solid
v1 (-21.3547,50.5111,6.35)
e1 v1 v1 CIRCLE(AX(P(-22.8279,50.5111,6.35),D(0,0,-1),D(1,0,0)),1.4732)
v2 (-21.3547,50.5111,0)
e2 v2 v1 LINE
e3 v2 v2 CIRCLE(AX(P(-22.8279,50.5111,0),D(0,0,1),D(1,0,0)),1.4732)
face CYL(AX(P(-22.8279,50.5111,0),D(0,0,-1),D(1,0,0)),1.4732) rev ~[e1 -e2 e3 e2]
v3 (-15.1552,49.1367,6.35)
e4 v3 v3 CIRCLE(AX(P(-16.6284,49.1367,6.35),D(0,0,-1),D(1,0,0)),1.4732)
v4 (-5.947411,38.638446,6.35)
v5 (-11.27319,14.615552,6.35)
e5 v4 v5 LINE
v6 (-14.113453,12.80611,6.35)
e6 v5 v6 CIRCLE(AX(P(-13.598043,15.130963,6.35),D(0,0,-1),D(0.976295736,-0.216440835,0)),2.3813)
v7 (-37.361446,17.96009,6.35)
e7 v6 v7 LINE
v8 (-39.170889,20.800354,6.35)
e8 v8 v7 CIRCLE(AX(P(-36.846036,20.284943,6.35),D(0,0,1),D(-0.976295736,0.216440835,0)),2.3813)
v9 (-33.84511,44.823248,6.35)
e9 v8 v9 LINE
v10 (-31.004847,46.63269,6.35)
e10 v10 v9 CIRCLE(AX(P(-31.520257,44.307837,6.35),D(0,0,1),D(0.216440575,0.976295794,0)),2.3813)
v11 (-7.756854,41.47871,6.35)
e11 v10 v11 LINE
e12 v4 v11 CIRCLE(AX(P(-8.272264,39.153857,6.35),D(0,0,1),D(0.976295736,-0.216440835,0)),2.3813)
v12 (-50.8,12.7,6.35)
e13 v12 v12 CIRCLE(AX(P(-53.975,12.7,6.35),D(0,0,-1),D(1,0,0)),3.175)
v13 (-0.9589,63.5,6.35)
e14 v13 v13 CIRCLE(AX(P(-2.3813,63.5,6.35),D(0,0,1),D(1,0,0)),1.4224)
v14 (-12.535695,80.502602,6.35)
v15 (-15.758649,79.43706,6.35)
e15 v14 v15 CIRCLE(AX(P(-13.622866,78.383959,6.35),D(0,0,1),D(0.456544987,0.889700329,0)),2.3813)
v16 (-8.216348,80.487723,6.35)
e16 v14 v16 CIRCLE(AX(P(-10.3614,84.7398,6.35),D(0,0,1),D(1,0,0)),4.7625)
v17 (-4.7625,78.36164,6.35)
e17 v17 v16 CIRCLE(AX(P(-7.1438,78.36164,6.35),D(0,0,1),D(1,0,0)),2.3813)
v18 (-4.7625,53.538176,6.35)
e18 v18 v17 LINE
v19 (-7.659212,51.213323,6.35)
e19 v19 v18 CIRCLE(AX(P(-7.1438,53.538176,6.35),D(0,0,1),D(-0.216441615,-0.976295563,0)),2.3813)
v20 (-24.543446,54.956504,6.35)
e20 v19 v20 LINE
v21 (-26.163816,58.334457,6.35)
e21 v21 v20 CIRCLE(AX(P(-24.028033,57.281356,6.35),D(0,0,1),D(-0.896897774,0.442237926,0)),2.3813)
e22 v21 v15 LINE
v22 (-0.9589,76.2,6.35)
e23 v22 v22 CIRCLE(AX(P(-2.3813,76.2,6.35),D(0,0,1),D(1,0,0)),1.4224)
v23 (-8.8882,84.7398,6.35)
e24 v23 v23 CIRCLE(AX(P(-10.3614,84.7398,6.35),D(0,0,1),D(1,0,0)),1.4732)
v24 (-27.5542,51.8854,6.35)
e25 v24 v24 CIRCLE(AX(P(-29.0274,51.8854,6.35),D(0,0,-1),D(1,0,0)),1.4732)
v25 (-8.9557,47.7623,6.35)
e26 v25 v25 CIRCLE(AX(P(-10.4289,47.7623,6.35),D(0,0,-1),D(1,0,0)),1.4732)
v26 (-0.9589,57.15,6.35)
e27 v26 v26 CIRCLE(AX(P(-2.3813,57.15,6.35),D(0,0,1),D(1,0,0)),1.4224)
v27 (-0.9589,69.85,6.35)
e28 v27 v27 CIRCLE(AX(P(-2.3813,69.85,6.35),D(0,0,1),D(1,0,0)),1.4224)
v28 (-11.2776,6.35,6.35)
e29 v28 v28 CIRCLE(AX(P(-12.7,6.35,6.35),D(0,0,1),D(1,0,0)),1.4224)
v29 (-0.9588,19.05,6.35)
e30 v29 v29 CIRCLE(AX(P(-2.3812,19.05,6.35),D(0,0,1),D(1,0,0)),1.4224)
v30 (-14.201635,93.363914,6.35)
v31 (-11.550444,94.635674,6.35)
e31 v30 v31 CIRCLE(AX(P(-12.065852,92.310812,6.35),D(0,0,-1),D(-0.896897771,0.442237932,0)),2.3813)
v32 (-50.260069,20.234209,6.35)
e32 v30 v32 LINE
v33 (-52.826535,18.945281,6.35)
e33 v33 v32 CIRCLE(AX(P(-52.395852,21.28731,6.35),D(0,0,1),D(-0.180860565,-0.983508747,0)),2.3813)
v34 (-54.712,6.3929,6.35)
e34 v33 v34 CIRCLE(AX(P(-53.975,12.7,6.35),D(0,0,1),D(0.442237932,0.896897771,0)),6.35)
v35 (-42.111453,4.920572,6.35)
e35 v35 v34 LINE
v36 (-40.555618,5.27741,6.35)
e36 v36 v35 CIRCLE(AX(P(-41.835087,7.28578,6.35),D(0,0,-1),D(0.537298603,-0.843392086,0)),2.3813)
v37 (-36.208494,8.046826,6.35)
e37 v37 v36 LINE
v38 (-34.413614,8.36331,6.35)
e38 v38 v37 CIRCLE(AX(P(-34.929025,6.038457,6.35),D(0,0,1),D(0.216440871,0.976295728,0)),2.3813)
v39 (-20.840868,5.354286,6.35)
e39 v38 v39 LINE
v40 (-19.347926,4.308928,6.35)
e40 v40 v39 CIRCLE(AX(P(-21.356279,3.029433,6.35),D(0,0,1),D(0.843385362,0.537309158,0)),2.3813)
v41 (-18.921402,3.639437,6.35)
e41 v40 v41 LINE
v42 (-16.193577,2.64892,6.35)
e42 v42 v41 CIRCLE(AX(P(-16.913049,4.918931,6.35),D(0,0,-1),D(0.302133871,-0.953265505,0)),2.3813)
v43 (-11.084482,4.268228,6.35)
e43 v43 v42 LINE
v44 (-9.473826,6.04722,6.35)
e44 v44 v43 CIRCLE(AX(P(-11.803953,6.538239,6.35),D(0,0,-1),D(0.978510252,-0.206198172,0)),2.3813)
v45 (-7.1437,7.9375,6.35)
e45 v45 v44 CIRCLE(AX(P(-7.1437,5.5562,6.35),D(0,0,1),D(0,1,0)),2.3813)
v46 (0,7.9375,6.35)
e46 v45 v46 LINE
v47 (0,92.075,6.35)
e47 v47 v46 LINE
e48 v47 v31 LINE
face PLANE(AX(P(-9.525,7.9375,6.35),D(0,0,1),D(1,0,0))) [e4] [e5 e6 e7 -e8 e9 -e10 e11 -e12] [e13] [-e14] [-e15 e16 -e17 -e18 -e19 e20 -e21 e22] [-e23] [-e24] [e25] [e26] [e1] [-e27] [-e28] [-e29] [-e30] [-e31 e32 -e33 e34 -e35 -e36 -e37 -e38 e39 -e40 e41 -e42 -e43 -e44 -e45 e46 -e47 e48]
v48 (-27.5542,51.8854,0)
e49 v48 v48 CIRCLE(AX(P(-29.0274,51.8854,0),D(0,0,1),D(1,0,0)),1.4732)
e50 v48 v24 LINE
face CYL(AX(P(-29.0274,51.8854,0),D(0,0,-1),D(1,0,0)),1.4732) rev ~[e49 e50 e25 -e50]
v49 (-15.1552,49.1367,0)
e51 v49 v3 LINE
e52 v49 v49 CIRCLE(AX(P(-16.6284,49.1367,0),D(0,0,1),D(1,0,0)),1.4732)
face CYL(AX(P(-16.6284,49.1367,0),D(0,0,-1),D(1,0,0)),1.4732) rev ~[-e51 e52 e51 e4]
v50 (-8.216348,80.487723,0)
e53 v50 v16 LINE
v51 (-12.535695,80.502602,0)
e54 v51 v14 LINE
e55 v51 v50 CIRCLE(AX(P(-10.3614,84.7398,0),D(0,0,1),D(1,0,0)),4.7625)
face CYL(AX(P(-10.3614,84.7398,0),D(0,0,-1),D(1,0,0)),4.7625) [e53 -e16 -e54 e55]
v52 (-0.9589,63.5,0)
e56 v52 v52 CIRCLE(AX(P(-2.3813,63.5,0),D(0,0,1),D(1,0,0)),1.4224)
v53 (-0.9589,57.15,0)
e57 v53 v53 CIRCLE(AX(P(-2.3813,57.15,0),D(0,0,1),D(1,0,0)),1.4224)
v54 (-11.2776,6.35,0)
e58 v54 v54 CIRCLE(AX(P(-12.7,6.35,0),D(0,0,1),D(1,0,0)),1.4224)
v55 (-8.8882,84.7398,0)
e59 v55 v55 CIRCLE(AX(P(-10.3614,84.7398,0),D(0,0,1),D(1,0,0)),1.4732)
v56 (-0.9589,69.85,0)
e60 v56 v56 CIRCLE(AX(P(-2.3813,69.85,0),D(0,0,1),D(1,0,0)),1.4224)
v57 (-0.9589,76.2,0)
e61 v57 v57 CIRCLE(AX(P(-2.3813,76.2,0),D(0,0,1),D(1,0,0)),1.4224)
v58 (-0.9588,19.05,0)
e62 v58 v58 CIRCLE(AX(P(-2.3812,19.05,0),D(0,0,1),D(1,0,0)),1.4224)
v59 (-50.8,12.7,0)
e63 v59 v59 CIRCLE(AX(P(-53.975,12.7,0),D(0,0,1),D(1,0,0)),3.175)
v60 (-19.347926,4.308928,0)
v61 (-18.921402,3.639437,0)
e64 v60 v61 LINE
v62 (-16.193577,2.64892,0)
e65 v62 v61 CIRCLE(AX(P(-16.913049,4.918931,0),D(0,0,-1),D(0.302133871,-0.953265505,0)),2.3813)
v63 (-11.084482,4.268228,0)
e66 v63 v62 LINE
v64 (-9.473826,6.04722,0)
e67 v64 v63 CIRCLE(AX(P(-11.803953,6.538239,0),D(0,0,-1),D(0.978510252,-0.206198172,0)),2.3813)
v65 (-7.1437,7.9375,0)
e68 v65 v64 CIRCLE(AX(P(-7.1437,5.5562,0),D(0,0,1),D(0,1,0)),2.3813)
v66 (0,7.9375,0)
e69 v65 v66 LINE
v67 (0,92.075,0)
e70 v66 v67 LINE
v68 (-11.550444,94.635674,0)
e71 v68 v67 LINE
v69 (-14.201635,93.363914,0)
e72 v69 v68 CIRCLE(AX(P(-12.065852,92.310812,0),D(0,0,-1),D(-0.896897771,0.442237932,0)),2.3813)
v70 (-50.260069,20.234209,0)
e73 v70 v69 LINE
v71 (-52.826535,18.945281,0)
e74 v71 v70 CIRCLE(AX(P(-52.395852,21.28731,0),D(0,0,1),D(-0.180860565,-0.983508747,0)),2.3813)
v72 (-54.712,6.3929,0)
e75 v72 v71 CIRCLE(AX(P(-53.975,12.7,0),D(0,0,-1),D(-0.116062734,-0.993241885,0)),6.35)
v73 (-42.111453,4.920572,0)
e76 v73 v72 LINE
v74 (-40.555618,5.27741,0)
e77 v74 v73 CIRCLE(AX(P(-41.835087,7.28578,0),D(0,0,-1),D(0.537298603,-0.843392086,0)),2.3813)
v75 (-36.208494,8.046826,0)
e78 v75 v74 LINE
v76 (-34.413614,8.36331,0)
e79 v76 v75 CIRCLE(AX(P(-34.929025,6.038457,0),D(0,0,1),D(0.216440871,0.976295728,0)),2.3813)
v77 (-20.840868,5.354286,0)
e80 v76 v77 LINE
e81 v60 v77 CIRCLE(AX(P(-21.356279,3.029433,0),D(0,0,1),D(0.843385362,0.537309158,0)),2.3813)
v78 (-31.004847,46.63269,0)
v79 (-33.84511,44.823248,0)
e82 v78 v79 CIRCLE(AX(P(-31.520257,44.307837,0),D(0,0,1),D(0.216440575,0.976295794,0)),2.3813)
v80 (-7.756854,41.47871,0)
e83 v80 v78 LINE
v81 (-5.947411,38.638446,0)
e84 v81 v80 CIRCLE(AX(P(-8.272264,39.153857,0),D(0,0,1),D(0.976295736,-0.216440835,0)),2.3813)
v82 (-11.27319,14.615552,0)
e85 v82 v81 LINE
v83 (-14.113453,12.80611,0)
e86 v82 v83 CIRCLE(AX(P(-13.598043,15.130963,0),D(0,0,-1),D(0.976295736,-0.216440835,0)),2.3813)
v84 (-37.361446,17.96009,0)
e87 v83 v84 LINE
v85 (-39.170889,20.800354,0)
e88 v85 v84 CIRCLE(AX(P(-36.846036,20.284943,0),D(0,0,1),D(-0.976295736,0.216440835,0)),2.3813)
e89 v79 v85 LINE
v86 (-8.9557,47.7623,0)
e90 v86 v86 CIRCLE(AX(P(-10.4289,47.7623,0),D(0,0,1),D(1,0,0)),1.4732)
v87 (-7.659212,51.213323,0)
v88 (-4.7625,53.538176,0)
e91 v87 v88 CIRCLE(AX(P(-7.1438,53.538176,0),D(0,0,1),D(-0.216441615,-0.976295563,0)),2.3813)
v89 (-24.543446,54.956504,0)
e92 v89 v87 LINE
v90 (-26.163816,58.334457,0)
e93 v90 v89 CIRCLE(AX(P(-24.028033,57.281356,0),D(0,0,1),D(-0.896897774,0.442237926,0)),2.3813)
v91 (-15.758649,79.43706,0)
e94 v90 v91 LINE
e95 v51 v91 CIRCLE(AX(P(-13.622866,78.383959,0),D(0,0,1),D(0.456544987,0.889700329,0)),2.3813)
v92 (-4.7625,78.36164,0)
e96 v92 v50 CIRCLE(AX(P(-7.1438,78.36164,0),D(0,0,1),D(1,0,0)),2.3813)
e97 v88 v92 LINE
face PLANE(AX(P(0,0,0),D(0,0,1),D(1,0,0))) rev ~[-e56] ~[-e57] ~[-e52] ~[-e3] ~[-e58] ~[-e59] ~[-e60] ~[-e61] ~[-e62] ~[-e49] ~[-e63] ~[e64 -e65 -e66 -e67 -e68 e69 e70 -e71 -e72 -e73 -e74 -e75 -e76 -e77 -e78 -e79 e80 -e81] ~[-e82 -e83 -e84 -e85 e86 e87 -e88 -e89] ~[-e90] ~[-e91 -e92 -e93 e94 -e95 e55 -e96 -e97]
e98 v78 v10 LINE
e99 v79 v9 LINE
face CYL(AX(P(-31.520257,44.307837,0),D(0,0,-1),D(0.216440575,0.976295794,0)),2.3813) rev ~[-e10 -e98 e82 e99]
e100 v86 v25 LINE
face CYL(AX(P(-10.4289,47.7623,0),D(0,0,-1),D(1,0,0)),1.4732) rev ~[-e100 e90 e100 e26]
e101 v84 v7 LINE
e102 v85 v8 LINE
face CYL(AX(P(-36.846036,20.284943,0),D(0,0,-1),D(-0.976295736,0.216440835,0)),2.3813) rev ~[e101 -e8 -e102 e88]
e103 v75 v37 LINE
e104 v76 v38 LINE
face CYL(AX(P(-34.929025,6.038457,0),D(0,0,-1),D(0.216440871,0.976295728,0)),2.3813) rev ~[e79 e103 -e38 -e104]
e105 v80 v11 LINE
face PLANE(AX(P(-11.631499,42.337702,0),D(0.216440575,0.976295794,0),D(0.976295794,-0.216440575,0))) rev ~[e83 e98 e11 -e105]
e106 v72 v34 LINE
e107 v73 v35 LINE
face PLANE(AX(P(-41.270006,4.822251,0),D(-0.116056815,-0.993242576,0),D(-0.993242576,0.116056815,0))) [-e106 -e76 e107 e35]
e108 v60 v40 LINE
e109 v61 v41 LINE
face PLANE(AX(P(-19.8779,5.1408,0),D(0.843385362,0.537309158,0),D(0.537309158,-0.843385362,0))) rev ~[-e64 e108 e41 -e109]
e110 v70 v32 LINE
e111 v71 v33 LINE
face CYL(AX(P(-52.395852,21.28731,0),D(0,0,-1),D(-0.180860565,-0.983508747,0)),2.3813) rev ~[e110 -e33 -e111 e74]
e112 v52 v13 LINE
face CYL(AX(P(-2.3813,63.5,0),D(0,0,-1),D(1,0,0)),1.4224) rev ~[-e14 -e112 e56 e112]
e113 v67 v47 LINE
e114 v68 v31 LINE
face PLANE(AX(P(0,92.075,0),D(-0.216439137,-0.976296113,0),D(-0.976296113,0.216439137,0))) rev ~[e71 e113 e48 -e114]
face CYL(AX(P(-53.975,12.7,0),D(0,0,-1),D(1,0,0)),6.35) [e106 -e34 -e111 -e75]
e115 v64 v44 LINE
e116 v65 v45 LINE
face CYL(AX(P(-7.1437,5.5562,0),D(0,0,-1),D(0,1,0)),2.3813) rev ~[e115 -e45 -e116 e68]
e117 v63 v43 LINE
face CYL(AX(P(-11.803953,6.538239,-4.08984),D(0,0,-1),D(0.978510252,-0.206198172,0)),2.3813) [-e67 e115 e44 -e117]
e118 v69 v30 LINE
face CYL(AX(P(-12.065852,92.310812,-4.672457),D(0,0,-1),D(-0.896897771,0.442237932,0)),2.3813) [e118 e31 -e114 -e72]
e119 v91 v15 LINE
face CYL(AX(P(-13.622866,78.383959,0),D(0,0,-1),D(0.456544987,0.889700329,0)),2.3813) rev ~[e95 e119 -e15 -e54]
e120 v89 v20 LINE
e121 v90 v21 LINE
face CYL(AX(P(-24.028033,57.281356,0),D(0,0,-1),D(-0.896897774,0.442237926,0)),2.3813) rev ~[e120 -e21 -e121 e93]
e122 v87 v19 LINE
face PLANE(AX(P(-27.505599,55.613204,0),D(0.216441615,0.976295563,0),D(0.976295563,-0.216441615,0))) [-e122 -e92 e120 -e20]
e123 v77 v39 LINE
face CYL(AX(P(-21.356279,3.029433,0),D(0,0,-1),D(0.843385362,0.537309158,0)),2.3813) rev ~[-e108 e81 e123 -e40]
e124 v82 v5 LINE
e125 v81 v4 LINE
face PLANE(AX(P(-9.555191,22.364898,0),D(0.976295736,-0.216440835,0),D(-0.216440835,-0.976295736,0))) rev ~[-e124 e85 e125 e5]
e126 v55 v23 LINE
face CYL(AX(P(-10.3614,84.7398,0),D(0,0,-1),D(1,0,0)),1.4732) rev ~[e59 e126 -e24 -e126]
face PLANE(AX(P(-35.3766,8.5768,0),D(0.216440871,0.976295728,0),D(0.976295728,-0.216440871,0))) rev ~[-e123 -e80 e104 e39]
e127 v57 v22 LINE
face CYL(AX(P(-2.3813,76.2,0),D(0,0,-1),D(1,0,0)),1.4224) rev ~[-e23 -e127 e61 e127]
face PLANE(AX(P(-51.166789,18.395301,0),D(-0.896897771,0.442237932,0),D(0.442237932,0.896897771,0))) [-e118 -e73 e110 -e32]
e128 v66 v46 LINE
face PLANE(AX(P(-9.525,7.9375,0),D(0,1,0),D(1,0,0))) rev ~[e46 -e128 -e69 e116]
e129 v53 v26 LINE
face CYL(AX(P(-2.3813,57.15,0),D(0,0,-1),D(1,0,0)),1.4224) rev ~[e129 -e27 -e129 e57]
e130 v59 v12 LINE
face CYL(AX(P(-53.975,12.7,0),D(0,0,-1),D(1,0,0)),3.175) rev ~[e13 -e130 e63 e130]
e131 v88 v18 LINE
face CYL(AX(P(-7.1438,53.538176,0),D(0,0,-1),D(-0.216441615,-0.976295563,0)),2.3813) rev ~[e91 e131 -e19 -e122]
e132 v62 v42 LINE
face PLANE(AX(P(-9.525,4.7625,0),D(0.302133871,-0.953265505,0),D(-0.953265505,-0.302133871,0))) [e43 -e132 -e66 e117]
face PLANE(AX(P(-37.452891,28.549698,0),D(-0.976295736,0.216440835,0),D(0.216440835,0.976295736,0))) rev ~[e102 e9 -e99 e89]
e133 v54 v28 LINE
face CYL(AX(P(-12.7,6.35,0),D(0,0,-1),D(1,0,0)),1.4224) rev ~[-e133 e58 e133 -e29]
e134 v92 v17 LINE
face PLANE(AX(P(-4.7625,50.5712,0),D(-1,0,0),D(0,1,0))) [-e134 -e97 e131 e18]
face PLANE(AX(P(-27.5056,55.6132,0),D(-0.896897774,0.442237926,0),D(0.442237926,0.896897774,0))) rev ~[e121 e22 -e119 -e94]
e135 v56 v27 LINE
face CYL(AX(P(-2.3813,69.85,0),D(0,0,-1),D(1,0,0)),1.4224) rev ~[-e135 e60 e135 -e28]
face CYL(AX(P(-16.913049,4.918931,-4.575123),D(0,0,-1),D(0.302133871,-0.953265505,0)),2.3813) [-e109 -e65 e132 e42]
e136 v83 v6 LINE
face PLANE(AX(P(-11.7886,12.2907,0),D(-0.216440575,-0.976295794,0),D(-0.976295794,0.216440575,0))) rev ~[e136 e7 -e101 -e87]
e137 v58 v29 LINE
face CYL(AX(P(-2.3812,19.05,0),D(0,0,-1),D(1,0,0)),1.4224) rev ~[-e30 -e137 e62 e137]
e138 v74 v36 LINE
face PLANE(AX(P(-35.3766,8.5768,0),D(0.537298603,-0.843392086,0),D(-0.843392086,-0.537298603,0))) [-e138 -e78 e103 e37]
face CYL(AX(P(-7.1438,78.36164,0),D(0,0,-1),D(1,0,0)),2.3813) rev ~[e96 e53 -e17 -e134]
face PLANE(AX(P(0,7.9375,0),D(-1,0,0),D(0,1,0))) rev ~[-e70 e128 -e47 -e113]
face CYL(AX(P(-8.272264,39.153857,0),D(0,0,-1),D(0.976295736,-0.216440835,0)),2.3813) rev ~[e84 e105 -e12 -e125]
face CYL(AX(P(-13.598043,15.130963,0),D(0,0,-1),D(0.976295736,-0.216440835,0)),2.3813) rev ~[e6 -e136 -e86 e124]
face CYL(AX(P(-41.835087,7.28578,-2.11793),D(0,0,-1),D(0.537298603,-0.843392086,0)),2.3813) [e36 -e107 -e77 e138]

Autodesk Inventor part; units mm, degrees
ref_plane "YZ Plane" through (0, 0, 0) normal (1, 0, 0) x (0, 1, 0)
ref_plane "XZ Plane" through (0, 0, 0) normal (0, 1, 0) x (-1, 0, 0)
ref_plane "XY Plane" through (0, 0, 0) normal (0, 0, 1) x (1, 0, 0)
sketch "Sketch1" plane through (0, 0, 0) normal (0, 0, 1) x (1, 0, 0)
  line L0 (0, 0) -> (0, 136.525)
  line L1 (-11.7886, 12.2907) -> (-39.6863, 18.4755)
  line L2 (-39.6863, 18.4755) -> (-33.3297, 47.1481)
  line L3 (-33.3297, 47.1481) -> (-5.432, 40.9633)
  line L4 (-5.432, 40.9633) -> (-11.7886, 12.2907)
  line L5 (-39.6863, 18.4755) -> (-5.432, 40.9633) construction
  line L6 (-33.3297, 47.1481) -> (-11.7886, 12.2907) construction
  circle A0 centre (-53.975, 12.7) radius 3.175
  circle A1 centre (-53.975, 12.7) radius 6.35
  line L7 (0, 0) -> (-54.712, 6.3929)
  line L8 (-59.6703, 15.5082) -> (0, 136.525)
  line L9 (-27.1302, 45.7737) -> (-37.4529, 28.5497)
  line L10 (-11.6315, 42.3377) -> (-9.5552, 22.3649)
  line L11 (-19.3809, 44.0557) -> (-25.7374, 15.3831) construction
  line L12 (0, 92.075) -> (-19.7574, 96.4551)
  line L13 (-35.3766, 8.5768) -> (-19.8779, 5.1408)
  line L14 (-19.8779, 5.1408) -> (-21.2523, -1.0586)
  line L15 (-21.2523, -1.0586) -> (-36.751, 2.3773)
  line L16 (-36.751, 2.3773) -> (-35.3766, 8.5768)
  line L17 (-35.3766, 8.5768) -> (-41.27, 4.8223)
  line L18 (-19.8779, 5.1408) -> (-17.9381, 2.096)
  line L19 (-5.432, 40.9633) -> (-33.3297, 47.1481)
  line L20 (-33.3297, 47.1481) -> (-32.2475, 52.0296)
  line L21 (-32.2475, 52.0296) -> (-4.3498, 45.8448)
  line L22 (-4.3498, 45.8448) -> (-5.432, 40.9633)
  line L23 (-53.2878, 15.7997) -> (-53.975, 12.7) construction
  line L24 (-53.975, 12.7) -> (-57.0747, 13.3872) construction
  line L25 (-27.6272, 6.8588) -> (-34.4992, -24.1386) construction
  line L26 (-31.8676, 50.076) -> (-5.5198, 44.2349)
  line L27 (-5.5198, 44.2349) -> (-4.489, 48.8845)
  line L28 (-4.489, 48.8845) -> (-30.8368, 54.7256)
  line L29 (-30.8368, 54.7256) -> (-31.8676, 50.076)
  line L30 (-31.3522, 52.4008) -> (-5.0044, 46.5597) construction
  circle A2 centre (-29.0274, 51.8854) radius 1.4732
  circle A3 centre (-22.8279, 50.5111) radius 1.4732
  circle A4 centre (-16.6284, 49.1367) radius 1.4732
  circle A5 centre (-10.4289, 47.7623) radius 1.4732
  circle A6 centre (-10.3614, 84.7398) radius 1.4732
  line L31 (-53.975, 12.7) -> (-13.3751, 95.0402)
  line L32 (-32.2923, 56.6744) -> (0, 49.5153)
  circle A7 centre (-10.3614, 84.7398) radius 4.7625
  line L33 (-4.7625, 50.5712) -> (-4.7625, 93.1308)
  line L34 (-27.5056, 55.6132) -> (-14.3936, 82.2055)
  line L35 (-5.6003, 84.6261) -> (-4.7625, 84.4403)
  circle A8 centre (-12.7, 6.35) radius 1.4224
  line L36 (-9.525, 4.7625) -> (-17.9381, 2.096)
  line L37 (-9.525, 7.9375) -> (-9.525, 4.7625)
  line L38 (-9.525, 7.9375) -> (0, 7.9375)
  line L39 (0, 13.4938) -> (-4.7625, 13.4937) construction
  line L40 (-4.7625, 13.4937) -> (-4.7625, 24.6063) construction
  line L41 (-4.7625, 24.6063) -> (0, 24.6063) construction
  line L42 (0, 24.6063) -> (0, 13.4938) construction
  line L43 (-4.7625, 19.05) -> (0, 19.05) construction
  circle A9 centre (-2.3812, 19.05) radius 1.4224
  line L44 (-4.7625, 57.15) -> (0, 57.15) construction
  circle A10 centre (-2.3813, 57.15) radius 1.4224
  circle A11 centre (-2.3813, 63.5) radius 1.4224
  circle A12 centre (-2.3813, 69.85) radius 1.4224
  circle A13 centre (-2.3813, 76.2) radius 1.4224
  line L45 (-34.4992, -24.1386) -> (-14.5705, 65.7539) construction
  line L46 (-14.5705, 65.7539) -> (-17.3193, 53.3549) construction
  line L47 (-17.3193, 53.3549) -> (-11.1198, 51.9805) construction
  line L48 (-11.1198, 51.9805) -> (-8.371, 64.3795) construction
  line L49 (-8.371, 64.3795) -> (-14.5705, 65.7539) construction
  line L50 (-14.2195, 52.6677) -> (-11.4708, 65.0667) construction
  line L51 (-15.9449, 59.5544) -> (-9.7454, 58.18) construction
  line L52 (-17.3193, 53.3549) -> (-9.7454, 58.18) construction
  line L53 (-14.5705, 65.7539) -> (-9.7454, 58.18) construction
  circle A14 centre (-13.5323, 55.7675) radius 1.4224
  circle A15 centre (-12.1579, 61.967) radius 1.4224
  line L54 (-14.2195, 52.6677) -> (-12.1579, 61.967) construction
  line L55 (-11.1198, 51.9805) -> (-9.0582, 61.2798)
  line L56 (-15.2577, 62.6542) -> (-17.3193, 53.3549)
  arc A16 (-17.3193, 53.3549) -> (-11.1198, 51.9805) centre (-14.2195, 52.6677) ccw construction
  arc A17 (-9.0582, 61.2798) -> (-15.2577, 62.6542) centre (-12.1579, 61.967) ccw
  point P0 (-22.5591, 29.7194)
  point P1 (-20.4869, 2.3938)
  point P2 (-36.3367, 4.2458)
  point P3 (-51.1668, 18.3953)
  point P4 (-4.7625, 7.9375)
  point P5 (-22.5591, 29.7194)
  point P6 (-13.1887, 57.3173)
  dimension "d13" = 136.525
  dimension "d14" = 29.3687
  dimension "d15" = 28.575
  dimension "d16" = 12.5
  dimension "d17" = 6.35
  dimension "d19" = 53.975
  dimension "d22" = 12.7
  dimension "d23" = 7.9375
  dimension "d24" = 19.05
  dimension "d26" = 102.5
  dimension "d29" = 6.35
  dimension "d31" = 7.9375
  dimension "d34" = 5
  dimension "d35" = 26.9875
  dimension "d38" = 31.75
  dimension "d40" = 26.9875
  dimension "d41" = 4.7625
  dimension "d42" = 2.9464
  dimension "d43" = 2.3813
  dimension "d46" = 6.35
  dimension "d51" = 2.9464
  dimension "d52" = 79.7719
  dimension "d53" = 6.35
  dimension "d54" = 9.525
  dimension "d55" = 4.7625
  dimension "d56" = 4.7625
  dimension "d60" = 12.7
  dimension "d61" = 3.175
  dimension "d66" = 2.8448
  dimension "d67" = 12.7
  dimension "d72" = 8.7312
  dimension "d75" = 34.925
  dimension "d80" = 92.075
  dimension "d81" = 6.35
  dimension "d82" = 7.9375
  dimension "d83" = 3.175
  dimension "d84" = 9.525
  dimension "d85" = 4.7625
  dimension "d86" = 11.1125
  dimension "d87" = 2.8448
  dimension "d88" = 19.05
  dimension "d89" = 2.8448
  dimension "d90" = 38.1
  dimension "d93" = 6.35
  dimension "d98" = 92.075
  dimension "d99" = 12.7
  dimension "d100" = 6.35
  dimension "d101" = 2.8448
  dimension "d102" = 2.8448
extrude "Extrusion1" add sketch "Sketch1" along normal blind 6.35 contours L38 L37 L36 L18 L13 L17 L7 A1 L31 L32 L0 | L32 L33 L12 L0 | L33 L35 A7 L34 L32 L31 L12 | A7 | A1 | L3 L20 L21 L29 L26 L27 L22 | L27 L26 L29 L21 A2 A3 A4 A5 | L21 A5 A4 A3 A2 L29 L28 L27
fillet "Fillet1" radius 2.3813 17 edges at (-39.6863, 18.4755, 3.175) (-11.7886, 12.2907, 3.175) (-51.1668, 18.3953, 3.175) (-19.8779, 5.1408, 3.175) (-35.3766, 8.5768, 3.175) (-41.27, 4.8223, 3.175) (-13.3751, 95.0402, 3.175) (-14.3936, 82.2055, 3.175) (-5.6003, 84.6261, 3.175) (-4.7625, 84.4403, 3.175) (-27.5056, 55.6132, 3.175) (-4.7625, 50.5712, 3.175) (-33.3297, 47.1481, 3.175) (-5.432, 40.9633, 3.175) (-17.9381, 2.096, 3.175) (-9.525, 7.9375, 3.175) (-9.525, 4.7625, 3.175)
equation "\"d56\" = d55"
properties part number "Uprights" material "Aluminum 6061"
